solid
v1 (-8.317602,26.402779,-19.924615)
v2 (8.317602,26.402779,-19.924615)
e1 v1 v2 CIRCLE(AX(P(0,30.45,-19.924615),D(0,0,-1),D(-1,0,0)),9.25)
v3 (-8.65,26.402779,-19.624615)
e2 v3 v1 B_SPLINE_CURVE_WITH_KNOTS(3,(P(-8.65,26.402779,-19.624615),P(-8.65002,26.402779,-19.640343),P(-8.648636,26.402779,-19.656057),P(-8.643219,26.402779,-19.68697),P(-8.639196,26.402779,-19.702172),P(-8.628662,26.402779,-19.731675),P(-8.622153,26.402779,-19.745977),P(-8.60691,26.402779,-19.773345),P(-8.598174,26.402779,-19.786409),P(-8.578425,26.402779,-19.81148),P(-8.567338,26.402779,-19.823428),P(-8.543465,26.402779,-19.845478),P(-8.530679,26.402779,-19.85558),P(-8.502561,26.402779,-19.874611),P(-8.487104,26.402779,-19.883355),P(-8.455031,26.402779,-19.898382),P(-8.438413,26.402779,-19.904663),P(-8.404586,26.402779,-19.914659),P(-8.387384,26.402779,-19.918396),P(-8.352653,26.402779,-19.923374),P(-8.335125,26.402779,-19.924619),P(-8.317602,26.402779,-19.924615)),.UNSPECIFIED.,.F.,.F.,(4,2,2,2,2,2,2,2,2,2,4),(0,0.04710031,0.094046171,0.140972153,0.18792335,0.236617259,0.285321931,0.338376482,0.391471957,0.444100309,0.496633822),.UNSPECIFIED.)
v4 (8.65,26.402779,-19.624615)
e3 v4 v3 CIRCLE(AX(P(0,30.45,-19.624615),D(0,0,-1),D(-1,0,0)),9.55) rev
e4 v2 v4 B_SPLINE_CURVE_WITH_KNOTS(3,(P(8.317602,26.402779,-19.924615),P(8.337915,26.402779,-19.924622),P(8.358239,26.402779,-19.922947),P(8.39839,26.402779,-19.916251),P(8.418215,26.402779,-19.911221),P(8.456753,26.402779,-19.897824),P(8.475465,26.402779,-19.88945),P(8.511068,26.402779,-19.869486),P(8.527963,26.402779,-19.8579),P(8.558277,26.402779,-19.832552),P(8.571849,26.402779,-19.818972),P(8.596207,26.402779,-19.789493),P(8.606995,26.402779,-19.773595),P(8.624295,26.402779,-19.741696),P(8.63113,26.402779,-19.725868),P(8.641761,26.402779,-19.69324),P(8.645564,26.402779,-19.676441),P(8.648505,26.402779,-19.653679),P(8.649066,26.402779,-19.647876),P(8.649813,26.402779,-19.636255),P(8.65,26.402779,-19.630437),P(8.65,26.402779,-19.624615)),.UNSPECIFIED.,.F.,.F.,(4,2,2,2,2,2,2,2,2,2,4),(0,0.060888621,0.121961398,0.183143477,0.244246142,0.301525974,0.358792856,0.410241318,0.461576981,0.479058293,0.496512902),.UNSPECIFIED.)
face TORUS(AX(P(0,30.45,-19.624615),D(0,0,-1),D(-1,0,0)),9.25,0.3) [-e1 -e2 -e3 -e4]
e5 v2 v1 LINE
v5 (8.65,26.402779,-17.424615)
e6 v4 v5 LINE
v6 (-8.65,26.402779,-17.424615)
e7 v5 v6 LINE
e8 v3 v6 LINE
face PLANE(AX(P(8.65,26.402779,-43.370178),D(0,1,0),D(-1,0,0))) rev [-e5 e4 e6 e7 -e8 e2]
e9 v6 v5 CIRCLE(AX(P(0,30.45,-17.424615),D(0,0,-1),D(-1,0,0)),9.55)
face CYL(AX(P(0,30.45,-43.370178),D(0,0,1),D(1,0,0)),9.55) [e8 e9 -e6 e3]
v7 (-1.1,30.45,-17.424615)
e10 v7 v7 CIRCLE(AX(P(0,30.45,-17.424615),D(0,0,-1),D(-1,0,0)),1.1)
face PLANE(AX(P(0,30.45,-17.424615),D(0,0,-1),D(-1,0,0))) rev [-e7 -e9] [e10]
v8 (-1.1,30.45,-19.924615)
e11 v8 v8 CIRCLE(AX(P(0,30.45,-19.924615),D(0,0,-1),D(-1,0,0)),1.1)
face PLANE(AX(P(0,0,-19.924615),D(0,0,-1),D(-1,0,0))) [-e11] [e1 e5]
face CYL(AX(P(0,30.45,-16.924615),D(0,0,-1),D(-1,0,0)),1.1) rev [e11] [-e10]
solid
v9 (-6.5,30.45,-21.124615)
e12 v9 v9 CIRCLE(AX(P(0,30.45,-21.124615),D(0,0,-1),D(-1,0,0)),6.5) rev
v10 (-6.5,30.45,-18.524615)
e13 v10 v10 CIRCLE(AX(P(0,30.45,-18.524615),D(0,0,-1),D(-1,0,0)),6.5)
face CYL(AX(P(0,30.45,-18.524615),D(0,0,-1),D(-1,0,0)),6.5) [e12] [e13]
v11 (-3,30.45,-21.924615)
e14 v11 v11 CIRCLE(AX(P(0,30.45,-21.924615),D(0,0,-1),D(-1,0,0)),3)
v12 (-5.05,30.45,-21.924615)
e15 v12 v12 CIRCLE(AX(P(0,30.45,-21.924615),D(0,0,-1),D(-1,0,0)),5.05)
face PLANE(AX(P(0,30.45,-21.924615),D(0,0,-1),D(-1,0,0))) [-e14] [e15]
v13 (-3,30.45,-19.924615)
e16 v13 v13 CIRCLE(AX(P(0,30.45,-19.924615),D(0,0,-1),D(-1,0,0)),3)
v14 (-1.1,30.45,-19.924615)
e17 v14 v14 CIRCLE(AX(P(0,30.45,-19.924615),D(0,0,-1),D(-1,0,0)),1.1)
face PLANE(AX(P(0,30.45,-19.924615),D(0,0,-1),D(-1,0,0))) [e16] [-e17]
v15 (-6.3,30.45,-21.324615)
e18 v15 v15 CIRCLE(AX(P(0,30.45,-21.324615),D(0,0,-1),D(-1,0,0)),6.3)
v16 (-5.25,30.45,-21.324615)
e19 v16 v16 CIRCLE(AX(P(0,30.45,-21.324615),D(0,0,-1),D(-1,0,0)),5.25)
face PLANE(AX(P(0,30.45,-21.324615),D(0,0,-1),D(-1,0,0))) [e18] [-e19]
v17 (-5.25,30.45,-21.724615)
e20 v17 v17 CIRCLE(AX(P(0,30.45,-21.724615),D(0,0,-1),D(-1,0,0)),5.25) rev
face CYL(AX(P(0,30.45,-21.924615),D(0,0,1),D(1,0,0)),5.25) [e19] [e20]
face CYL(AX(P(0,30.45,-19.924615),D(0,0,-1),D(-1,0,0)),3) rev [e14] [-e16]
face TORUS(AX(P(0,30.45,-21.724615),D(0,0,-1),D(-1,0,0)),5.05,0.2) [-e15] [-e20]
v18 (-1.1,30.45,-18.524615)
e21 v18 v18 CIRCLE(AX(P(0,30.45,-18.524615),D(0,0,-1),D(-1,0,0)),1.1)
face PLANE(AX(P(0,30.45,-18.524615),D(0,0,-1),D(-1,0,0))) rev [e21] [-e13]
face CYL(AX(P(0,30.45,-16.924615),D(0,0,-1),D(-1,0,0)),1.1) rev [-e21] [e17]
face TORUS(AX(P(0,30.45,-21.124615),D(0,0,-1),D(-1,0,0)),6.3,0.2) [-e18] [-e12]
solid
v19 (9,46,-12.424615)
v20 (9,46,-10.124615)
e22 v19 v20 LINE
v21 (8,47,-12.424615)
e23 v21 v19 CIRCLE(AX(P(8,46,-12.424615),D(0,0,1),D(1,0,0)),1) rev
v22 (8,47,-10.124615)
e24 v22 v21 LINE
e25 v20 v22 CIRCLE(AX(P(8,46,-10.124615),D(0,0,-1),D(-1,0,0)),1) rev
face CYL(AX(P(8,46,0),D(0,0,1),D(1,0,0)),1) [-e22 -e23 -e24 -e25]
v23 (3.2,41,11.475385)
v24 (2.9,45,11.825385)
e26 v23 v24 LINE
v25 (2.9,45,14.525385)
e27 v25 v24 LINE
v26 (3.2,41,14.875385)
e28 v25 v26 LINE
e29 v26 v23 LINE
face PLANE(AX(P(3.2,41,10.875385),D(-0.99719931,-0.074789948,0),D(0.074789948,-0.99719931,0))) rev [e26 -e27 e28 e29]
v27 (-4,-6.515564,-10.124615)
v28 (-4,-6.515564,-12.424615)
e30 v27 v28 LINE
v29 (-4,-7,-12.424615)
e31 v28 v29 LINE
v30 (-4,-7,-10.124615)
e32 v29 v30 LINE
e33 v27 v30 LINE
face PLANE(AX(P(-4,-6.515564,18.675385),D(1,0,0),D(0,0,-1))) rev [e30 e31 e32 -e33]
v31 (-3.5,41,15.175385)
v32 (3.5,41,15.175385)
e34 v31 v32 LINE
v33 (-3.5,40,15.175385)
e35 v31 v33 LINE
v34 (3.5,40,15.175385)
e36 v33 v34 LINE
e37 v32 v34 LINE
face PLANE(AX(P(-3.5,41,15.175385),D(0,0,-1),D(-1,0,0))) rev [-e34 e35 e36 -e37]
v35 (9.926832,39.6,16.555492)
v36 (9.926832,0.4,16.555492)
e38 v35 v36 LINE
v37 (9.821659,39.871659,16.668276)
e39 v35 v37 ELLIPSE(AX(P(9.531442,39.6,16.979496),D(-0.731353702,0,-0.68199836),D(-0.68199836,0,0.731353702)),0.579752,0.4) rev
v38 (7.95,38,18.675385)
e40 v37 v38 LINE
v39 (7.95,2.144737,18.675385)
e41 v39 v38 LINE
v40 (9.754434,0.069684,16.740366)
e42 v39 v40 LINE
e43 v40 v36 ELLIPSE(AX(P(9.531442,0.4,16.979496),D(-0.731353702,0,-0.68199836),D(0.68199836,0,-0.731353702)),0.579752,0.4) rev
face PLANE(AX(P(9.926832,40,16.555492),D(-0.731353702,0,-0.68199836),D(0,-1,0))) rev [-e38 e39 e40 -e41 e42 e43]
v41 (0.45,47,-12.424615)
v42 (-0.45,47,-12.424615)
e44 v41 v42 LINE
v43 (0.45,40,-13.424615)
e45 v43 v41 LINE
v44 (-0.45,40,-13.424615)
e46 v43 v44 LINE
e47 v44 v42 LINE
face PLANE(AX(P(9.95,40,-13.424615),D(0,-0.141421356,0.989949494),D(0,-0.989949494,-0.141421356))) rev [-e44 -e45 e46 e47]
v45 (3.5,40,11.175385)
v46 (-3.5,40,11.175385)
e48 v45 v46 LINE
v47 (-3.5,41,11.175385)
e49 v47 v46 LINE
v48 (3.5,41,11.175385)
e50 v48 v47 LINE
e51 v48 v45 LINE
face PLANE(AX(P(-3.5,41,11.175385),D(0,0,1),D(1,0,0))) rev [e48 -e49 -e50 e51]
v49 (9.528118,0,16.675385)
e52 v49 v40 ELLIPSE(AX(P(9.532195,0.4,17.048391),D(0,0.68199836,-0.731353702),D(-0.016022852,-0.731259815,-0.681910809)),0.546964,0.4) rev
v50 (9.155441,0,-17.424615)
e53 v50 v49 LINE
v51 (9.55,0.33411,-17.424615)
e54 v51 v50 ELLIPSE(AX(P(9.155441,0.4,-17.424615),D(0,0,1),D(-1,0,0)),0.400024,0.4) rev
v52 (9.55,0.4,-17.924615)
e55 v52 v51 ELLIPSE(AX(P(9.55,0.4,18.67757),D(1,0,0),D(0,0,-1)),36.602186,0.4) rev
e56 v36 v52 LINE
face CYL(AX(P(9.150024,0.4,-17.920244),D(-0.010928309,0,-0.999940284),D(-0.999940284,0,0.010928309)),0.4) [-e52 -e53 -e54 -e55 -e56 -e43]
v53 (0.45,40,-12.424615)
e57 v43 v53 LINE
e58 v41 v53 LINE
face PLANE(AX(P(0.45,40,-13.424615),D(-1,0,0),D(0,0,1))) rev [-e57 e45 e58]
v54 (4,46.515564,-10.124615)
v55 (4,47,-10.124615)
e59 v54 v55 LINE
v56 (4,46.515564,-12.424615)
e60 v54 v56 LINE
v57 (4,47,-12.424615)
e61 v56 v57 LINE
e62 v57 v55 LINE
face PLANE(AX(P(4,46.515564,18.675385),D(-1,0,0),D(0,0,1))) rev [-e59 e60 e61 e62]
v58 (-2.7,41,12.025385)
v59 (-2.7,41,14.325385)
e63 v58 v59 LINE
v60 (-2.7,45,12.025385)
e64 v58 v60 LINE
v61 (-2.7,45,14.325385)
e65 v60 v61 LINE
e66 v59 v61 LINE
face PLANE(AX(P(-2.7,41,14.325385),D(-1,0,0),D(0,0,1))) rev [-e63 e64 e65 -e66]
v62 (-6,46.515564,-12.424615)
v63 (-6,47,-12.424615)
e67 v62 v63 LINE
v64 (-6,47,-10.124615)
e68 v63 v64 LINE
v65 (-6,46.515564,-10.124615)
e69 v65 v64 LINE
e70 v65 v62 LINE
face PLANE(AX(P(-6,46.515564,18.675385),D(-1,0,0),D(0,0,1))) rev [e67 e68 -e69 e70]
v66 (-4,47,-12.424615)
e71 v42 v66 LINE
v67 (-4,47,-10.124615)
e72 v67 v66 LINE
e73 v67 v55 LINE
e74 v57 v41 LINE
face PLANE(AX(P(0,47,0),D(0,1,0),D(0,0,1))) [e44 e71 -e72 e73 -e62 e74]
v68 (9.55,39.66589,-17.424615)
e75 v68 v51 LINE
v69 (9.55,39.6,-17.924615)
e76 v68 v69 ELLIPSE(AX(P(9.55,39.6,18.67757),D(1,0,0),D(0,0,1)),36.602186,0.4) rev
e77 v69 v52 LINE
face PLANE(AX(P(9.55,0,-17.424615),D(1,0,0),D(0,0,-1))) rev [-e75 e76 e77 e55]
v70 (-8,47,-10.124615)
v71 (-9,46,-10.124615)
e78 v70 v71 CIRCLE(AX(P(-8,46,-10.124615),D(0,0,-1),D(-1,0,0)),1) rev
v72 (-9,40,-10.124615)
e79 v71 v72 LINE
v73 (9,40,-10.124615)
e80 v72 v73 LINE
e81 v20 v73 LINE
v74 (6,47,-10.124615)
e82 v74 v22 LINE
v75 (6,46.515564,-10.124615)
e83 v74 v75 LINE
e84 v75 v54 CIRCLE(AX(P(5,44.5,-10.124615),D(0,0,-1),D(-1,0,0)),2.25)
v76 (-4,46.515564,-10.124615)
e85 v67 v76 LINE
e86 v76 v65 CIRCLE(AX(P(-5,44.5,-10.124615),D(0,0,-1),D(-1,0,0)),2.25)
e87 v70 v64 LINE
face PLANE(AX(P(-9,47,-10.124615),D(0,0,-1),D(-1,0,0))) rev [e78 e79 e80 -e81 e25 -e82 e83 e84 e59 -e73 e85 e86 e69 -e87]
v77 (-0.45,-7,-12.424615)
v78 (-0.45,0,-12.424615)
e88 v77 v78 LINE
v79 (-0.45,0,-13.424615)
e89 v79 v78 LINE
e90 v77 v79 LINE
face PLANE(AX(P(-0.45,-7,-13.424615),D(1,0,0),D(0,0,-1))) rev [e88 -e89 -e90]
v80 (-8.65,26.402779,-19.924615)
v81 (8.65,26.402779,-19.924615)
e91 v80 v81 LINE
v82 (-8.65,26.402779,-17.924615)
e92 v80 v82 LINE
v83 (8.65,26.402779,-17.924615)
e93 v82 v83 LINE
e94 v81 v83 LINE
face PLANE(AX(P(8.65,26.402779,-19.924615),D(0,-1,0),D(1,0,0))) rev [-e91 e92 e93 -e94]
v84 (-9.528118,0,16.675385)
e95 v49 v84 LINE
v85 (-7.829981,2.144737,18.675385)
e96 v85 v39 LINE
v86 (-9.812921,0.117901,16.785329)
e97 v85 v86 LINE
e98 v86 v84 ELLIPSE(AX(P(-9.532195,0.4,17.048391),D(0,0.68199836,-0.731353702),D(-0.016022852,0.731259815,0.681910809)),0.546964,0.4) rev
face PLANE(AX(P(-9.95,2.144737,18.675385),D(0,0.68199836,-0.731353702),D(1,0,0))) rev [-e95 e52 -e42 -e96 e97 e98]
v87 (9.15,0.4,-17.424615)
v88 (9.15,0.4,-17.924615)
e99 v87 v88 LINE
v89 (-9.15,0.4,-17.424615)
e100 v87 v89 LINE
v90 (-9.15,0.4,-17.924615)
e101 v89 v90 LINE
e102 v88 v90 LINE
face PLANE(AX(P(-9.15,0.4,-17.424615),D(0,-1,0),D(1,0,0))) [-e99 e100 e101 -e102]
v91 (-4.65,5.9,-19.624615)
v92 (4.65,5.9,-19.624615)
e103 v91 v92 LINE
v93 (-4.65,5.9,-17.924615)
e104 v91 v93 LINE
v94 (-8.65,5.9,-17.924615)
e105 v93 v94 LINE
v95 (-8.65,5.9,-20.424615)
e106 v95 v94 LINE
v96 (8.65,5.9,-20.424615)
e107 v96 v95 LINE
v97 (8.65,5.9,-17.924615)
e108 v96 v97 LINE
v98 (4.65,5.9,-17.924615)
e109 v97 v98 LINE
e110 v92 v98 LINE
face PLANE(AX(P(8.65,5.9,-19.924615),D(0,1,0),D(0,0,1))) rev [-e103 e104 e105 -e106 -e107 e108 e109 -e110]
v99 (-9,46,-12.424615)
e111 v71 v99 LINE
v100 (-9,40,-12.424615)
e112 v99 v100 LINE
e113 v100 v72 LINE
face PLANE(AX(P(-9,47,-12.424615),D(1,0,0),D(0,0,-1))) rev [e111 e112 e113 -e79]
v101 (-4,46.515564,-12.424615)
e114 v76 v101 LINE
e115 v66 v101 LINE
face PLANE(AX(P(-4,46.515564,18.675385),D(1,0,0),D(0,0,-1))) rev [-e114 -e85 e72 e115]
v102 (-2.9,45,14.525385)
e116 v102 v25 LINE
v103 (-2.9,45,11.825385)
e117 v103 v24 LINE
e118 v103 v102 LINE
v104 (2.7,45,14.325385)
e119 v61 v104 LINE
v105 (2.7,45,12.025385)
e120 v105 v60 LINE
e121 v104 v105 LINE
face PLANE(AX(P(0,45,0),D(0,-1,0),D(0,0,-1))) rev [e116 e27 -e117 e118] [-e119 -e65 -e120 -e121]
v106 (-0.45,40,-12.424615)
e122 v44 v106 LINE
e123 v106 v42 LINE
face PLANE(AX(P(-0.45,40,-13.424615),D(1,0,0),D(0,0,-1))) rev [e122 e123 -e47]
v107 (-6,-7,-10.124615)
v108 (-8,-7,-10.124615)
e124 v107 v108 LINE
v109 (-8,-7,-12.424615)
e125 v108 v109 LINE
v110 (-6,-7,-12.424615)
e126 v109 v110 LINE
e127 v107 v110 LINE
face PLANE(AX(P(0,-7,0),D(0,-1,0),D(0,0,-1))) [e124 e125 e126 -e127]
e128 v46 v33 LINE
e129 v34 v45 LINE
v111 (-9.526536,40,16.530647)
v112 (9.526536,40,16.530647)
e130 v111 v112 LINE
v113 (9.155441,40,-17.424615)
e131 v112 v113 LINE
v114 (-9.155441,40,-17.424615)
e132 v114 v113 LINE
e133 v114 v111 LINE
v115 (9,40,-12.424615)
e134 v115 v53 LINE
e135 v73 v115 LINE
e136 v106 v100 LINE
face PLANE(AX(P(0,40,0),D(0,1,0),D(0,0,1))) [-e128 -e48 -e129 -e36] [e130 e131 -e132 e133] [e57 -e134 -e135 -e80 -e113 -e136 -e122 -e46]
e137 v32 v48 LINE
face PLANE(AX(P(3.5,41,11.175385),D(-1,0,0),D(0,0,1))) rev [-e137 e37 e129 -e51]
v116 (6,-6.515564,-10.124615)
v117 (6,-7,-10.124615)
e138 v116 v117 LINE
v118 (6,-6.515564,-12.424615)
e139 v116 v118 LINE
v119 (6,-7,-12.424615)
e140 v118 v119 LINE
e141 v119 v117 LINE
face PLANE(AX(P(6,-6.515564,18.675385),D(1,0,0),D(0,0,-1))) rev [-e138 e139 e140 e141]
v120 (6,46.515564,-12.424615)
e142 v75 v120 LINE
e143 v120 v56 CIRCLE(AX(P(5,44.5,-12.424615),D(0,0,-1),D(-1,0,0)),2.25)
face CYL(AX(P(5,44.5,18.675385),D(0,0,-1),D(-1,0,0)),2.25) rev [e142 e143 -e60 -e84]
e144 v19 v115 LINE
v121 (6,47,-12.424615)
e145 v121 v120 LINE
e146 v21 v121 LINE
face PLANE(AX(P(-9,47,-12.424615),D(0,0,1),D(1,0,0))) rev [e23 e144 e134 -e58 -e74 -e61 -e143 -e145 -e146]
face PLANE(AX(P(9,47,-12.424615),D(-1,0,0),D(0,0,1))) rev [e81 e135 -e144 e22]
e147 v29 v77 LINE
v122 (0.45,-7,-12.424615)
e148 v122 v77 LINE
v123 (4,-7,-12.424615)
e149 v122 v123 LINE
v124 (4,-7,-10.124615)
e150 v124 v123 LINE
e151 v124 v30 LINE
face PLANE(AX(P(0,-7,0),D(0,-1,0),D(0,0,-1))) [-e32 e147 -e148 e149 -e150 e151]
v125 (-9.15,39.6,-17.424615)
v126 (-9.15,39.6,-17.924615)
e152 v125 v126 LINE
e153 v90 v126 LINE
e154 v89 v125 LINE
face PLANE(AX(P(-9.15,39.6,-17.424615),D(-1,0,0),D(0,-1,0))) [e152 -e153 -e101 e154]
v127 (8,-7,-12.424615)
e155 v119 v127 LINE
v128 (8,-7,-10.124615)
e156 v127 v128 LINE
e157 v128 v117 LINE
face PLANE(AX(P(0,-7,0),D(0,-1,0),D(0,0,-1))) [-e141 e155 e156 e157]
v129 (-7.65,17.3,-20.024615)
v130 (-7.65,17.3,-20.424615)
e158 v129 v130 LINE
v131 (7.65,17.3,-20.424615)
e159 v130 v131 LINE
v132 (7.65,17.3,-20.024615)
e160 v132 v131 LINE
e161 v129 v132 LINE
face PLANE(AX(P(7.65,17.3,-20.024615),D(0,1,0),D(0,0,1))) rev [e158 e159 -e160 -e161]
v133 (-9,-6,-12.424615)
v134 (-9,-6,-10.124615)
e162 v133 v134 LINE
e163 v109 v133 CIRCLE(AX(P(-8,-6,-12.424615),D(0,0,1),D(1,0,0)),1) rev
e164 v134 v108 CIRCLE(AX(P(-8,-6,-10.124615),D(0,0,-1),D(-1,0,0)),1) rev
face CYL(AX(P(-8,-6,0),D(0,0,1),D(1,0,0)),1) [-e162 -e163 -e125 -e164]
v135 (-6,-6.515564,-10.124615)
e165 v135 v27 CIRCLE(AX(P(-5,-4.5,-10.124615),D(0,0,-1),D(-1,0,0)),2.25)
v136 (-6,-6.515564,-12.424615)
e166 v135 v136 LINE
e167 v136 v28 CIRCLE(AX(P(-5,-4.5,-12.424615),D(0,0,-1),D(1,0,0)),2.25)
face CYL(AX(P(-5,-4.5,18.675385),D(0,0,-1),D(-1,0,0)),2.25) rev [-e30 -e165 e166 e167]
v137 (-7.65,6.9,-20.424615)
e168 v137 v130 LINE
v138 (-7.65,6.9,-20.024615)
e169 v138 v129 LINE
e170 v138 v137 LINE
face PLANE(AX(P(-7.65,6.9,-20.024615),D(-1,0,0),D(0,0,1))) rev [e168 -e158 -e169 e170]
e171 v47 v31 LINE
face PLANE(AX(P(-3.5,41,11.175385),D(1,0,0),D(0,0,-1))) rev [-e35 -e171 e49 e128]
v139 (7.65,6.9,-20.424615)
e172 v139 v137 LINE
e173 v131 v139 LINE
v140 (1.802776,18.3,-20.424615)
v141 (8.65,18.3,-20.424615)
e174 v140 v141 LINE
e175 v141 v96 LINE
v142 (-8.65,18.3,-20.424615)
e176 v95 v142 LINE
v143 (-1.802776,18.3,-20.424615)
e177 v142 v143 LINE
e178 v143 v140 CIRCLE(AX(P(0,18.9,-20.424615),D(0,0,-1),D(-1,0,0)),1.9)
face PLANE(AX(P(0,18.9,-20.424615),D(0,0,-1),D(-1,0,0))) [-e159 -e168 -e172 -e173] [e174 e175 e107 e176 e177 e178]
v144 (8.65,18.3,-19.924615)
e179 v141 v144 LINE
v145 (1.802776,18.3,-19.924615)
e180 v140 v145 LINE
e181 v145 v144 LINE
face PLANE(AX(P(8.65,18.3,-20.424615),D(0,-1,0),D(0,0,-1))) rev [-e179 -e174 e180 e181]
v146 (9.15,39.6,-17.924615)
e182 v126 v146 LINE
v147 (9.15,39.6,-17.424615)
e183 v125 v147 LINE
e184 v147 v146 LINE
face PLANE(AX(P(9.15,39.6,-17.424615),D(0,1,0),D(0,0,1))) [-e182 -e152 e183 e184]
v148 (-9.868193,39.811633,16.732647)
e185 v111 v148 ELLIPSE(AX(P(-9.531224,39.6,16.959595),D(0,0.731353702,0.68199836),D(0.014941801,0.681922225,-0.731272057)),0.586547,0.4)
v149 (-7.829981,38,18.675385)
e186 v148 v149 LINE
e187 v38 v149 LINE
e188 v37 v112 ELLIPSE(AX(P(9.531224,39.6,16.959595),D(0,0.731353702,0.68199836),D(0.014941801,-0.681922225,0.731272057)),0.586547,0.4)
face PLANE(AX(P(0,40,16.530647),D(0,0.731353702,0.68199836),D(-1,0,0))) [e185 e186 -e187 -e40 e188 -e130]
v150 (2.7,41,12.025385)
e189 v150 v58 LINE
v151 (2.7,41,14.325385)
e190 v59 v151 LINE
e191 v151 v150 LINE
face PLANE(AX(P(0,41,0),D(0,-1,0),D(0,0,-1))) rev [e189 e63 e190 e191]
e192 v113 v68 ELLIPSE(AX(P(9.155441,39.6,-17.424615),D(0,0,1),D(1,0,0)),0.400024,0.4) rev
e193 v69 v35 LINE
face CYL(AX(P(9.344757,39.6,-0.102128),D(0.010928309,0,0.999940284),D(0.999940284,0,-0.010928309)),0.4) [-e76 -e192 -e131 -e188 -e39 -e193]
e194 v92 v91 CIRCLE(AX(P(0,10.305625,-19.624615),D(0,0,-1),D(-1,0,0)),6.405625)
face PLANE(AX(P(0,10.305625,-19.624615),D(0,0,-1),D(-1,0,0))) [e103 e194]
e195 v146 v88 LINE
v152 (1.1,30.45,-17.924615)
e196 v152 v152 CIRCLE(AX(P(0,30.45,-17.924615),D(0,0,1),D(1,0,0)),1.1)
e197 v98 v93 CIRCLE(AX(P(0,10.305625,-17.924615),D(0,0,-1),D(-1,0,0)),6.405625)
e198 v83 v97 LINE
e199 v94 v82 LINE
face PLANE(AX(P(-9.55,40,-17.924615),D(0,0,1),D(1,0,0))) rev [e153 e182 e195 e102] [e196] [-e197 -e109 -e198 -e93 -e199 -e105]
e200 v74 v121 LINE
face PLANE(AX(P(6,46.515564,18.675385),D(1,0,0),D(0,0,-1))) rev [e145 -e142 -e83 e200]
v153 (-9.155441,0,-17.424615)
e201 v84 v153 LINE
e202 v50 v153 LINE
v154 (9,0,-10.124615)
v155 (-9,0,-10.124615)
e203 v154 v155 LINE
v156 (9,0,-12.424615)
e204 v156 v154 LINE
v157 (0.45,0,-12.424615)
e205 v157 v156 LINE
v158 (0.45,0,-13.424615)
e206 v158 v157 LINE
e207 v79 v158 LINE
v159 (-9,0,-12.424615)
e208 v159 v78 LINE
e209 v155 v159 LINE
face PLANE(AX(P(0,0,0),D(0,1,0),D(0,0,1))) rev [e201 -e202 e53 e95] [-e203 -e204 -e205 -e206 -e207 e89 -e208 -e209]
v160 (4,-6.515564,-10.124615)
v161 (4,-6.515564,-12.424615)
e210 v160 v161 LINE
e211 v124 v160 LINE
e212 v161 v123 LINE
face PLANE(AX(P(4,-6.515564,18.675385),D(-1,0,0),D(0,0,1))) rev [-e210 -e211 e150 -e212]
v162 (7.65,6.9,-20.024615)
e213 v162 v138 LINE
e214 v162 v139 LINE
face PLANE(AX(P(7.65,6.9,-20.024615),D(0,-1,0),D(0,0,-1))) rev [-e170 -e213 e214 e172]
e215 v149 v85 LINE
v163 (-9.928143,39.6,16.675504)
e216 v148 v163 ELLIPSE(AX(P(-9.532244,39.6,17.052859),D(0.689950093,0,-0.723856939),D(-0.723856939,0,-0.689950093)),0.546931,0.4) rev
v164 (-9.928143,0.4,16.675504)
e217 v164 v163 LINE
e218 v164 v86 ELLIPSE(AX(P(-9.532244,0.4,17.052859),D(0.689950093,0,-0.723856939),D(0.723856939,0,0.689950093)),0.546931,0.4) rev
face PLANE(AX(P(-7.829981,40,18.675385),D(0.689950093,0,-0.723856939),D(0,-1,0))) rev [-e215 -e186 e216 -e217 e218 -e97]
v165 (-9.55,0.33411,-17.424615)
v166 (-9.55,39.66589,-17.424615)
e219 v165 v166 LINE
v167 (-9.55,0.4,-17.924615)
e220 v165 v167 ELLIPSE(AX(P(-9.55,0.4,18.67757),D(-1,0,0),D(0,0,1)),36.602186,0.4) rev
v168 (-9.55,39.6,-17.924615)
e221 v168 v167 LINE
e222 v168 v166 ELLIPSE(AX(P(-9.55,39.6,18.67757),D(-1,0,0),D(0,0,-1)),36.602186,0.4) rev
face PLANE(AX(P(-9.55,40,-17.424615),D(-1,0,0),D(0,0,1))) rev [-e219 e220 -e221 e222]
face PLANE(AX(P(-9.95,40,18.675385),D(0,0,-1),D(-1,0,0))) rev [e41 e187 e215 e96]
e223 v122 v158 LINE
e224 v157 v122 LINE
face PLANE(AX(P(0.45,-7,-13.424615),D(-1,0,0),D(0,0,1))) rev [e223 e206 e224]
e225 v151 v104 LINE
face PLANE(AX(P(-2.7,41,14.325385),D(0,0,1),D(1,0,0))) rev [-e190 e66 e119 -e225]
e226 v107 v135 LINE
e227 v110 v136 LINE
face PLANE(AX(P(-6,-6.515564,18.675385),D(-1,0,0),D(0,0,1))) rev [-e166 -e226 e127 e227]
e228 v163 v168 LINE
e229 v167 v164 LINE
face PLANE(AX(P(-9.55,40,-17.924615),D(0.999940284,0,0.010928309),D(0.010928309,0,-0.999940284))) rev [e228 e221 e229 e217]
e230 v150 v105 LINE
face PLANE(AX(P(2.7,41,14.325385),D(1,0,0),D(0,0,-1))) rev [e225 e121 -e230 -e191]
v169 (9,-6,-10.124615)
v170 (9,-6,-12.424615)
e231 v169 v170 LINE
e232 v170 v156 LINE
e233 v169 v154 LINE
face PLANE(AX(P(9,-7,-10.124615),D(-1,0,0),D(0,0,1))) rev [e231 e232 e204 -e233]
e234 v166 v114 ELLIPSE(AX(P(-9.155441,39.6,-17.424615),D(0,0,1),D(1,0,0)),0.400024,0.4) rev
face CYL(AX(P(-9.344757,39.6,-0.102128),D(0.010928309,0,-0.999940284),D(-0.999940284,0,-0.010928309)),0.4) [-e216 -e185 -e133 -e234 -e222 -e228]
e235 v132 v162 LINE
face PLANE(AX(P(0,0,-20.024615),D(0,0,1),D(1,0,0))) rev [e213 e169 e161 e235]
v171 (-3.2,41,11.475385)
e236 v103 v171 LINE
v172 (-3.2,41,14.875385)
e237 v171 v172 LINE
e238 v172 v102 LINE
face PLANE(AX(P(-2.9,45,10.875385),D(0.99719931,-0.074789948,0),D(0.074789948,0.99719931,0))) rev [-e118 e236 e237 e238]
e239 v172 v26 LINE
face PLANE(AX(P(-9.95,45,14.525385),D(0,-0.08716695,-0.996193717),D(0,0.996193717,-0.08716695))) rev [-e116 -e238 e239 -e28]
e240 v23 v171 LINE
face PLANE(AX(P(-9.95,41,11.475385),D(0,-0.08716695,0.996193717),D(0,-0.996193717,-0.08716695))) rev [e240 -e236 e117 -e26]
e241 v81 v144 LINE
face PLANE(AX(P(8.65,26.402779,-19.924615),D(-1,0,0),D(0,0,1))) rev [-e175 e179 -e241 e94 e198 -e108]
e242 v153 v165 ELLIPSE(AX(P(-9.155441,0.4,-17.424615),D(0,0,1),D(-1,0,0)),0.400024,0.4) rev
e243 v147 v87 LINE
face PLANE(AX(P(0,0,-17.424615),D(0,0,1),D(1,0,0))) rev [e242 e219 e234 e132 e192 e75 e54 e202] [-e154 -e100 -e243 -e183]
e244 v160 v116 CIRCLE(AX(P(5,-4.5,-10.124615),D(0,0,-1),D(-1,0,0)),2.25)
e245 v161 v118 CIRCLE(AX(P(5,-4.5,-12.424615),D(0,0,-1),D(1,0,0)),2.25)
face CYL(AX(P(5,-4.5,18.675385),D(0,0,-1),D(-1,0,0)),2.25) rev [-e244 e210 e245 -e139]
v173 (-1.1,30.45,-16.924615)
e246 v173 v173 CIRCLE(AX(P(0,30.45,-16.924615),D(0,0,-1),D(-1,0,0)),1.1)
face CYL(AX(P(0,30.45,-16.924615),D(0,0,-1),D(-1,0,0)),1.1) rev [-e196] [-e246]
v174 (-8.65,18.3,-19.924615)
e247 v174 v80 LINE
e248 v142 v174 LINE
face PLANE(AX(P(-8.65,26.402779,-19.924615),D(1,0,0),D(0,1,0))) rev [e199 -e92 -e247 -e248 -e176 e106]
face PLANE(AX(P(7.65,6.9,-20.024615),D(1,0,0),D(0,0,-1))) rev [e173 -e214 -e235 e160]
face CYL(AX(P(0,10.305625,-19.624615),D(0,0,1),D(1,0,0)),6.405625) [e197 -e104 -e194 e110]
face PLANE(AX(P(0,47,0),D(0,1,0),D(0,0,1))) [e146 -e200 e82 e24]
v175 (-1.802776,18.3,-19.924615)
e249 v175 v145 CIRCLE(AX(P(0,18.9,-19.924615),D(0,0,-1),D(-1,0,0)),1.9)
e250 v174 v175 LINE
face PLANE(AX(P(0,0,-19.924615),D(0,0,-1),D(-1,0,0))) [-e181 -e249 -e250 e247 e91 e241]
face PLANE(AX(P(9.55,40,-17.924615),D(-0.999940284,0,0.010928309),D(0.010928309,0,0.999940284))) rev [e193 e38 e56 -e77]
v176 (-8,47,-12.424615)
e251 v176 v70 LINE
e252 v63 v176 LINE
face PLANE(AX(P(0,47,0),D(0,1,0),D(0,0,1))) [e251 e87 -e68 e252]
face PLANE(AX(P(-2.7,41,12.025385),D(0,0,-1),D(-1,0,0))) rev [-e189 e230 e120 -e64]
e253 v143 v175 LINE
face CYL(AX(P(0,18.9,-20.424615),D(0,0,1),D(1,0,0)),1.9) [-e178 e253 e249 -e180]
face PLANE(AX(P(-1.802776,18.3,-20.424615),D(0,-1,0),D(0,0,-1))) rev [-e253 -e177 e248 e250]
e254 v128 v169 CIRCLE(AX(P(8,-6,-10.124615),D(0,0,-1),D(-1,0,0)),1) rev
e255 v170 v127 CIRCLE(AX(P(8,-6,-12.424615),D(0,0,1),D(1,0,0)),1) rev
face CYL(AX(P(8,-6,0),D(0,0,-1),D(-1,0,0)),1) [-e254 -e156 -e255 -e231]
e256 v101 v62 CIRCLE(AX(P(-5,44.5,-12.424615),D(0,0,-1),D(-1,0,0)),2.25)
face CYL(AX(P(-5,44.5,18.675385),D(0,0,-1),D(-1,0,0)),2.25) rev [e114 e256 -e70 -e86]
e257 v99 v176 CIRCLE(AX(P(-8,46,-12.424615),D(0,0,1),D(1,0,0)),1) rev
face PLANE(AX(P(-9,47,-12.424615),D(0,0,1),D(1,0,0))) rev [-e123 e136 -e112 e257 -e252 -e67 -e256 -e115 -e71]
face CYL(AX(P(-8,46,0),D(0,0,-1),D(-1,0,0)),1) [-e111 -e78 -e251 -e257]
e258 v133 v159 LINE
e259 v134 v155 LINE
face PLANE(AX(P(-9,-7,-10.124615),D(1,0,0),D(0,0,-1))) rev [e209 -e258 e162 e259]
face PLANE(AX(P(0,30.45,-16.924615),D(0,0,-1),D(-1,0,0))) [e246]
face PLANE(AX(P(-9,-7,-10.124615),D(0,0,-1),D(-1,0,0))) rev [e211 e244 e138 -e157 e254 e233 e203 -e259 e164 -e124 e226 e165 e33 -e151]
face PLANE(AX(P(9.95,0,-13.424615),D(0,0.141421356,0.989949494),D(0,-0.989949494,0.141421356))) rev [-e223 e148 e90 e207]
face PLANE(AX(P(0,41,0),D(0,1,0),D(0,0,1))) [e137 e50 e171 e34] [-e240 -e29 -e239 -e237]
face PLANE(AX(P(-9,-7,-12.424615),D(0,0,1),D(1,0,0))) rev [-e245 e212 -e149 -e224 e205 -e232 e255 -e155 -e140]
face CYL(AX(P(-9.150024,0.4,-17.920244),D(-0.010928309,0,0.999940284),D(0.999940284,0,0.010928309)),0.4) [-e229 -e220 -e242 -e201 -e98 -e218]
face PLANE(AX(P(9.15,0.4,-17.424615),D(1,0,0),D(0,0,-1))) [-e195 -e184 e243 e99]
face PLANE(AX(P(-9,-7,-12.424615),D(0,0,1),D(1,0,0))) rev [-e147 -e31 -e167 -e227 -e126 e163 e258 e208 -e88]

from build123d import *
from OCP.BRepFilletAPI import BRepFilletAPI_MakeChamfer

# Parameters (mm, degrees)
SALIENTE_EXTRUIR1_DEPTH       = 40
CROQUIS2_W                    = 19.1
CROQUIS2_H                    = 40
CROQUIS2_W_2                  = 18.3
CROQUIS2_H_2                  = 39.2
CORTAR_EXTRUIR1_DEPTH         = 0.5
CROQUIS3_W                    = 17.3
CROQUIS3_H                    = 20.502778731
SALIENTE_EXTRUIR5_DEPTH       = 2
SALIENTE_EXTRUIR10_DEPTH      = 2.5
SALIENTE_EXTRUIR11_DEPTH      = 1.7
SALIENTE_EXTRUIR12_DEPTH      = 0.5
SALIENTE_EXTRUIR14_DEPTH      = 1.4
SALIENTE_EXTRUIR14_DEPTH_BACK = 1.4
CROQUIS7_R                    = 6.5
CROQUIS8_R                    = 5.25
SALIENTE_EXTRUIR15_DEPTH      = 0.6
CROQUIS9_W                    = 18
CROQUIS9_H                    = 2.3
SALIENTE_EXTRUIR16_DEPTH      = 7
CROQUIS10_W                   = 18
CROQUIS10_H                   = 2.3
SALIENTE_EXTRUIR17_DEPTH      = 7
CORTAR_EXTRUIR2_DEPTH         = 58.229472302
CROQUIS12_W                   = 0.9
CROQUIS12_H                   = 7
SALIENTE_EXTRUIR18_DEPTH      = 1
CORTAR_EXTRUIR3_DEPTH         = 53.894695006
CROQUIS14_W                   = 15.3
CROQUIS14_H                   = 10.4
CORTAR_EXTRUIR4_DEPTH         = 0.4
CROQUIS15_R                   = 3
CORTAR_EXTRUIR5_DEPTH         = 2
CROQUIS16_R                   = 1.1
CORTAR_EXTRUIR6_DEPTH         = 3
CROQUIS17_W                   = 7
CROQUIS17_H                   = 4
SALIENTE_EXTRUIR19_DEPTH      = 1
CROQUIS18_W                   = 6.4
CROQUIS18_H                   = 3.4
SALIENTE_EXTRUIR20_DEPTH      = 4
CORTAR_EXTRUIR7_DEPTH         = 4
CORTAR_EXTRUIR9_DEPTH         = 54.577898986
CROQUIS23_W                   = 5.4
CROQUIS23_H                   = 2.3
CORTAR_EXTRUIR10_DEPTH        = 4
REDONDEO1_R                   = 1
REDONDEO2_R                   = 0.3
REDONDEO3_R                   = 0.2
CHAFL_N1_SIZE                 = 2
CHAFL_N1_SIZE2                = 2.14473742
CHAFL_N1_SIZE2_2              = 2.12001914
REDONDEO5_R                   = 0.4


with BuildPart() as part:
    # Croquis1 → Saliente-Extruir1 (new body)
    with BuildSketch(Plane(origin=(0, 0, 0), x_dir=(1, 0, 0), z_dir=(0, 1, 0))):
        Polygon((-9.55, 17.924615385), (9.55, 17.924615385), (9.95, -18.675384615), (-9.95, -18.675384615), align=None)
    extrude(amount=SALIENTE_EXTRUIR1_DEPTH)

    # Croquis2 → Cortar-Extruir1 (cut)
    with BuildSketch(Plane(origin=(0, 0, -17.924615385), x_dir=(-1, 0, 0), z_dir=(0, 0, -1))):
        with Locations((0, 20)):
            Rectangle(CROQUIS2_W, CROQUIS2_H)
        with Locations((0, 20)):
            Rectangle(CROQUIS2_W_2, CROQUIS2_H_2, mode=Mode.SUBTRACT)
    extrude(amount=-CORTAR_EXTRUIR1_DEPTH, mode=Mode.SUBTRACT)

    # Croquis3 → Saliente-Extruir5 (add)
    with BuildSketch(Plane(origin=(0, 0, -17.924615385), x_dir=(-1, 0, 0), z_dir=(0, 0, -1))):
        with Locations((0, 16.151389366)):
            Rectangle(CROQUIS3_W, CROQUIS3_H)
    extrude(amount=SALIENTE_EXTRUIR5_DEPTH)

    # Croquis5 → Saliente-Extruir11 (add)
    with BuildSketch(Plane(origin=(0, 0, -17.924615385), x_dir=(-1, 0, 0), z_dir=(0, 0, -1))):
        with BuildLine():
            Line((-4.65, 5.9), (4.65, 5.9))
            ThreePointArc((4.65, 5.9), (0, 3.9), (-4.65, 5.9))
        make_face()
    extrude(amount=SALIENTE_EXTRUIR11_DEPTH)

    # Croquis6 → Saliente-Extruir12 (add)
    with BuildSketch(Plane(origin=(0, 0, -19.924615385), x_dir=(-1, 0, 0), z_dir=(0, 0, -1))):
        with BuildLine():
            Line((-8.65, 5.9), (8.65, 5.9))
            Line((8.65, 5.9), (8.65, 18.3))
            Line((8.65, 18.3), (1.802775638, 18.3))
            ThreePointArc((1.802775638, 18.3), (0, 20.8), (-1.802775638, 18.3))
            Line((-1.802775638, 18.3), (-8.65, 18.3))
            Line((-8.65, 18.3), (-8.65, 5.9))
        make_face()
    extrude(amount=SALIENTE_EXTRUIR12_DEPTH)

    # Croquis9 → Saliente-Extruir16 (add)
    with BuildSketch(Plane(origin=(0, 40, 0), x_dir=(1, 0, 0), z_dir=(0, 1, 0))):
        with Locations((0, 11.274615385)):
            Rectangle(CROQUIS9_W, CROQUIS9_H)
    extrude(amount=SALIENTE_EXTRUIR16_DEPTH)

    # Croquis10 → Saliente-Extruir17 (add)
    with BuildSketch(Plane.XZ):
        with Locations((0, -11.274615385)):
            Rectangle(CROQUIS10_W, CROQUIS10_H)
    extrude(amount=SALIENTE_EXTRUIR17_DEPTH)

    # Croquis11 → Cortar-Extruir2 (cut, through all)
    with BuildSketch(Plane(origin=(0, 0, -12.424615385), x_dir=(-1, 0, 0), z_dir=(0, 0, -1))):
        with BuildLine():
            Line((-6, 46.515564437), (-6, 47.543757467))
            Line((-6, 47.543757467), (-4, 47.543757467))
            Line((-4, 47.543757467), (-4, 46.515564437))
            ThreePointArc((-4, 46.515564437), (-5, 42.25), (-6, 46.515564437))
        make_face()
        with BuildLine():
            Line((4, 46.515564437), (4, 47.543757467))
            Line((4, 47.543757467), (6, 47.543757467))
            Line((6, 47.543757467), (6, 46.515564437))
            ThreePointArc((6, 46.515564437), (5, 42.25), (4, 46.515564437))
        make_face()
        with BuildLine():
            Line((6, -6.515564437), (6, -7.543757467))
            Line((6, -7.543757467), (4, -7.543757467))
            Line((4, -7.543757467), (4, -6.515564437))
            ThreePointArc((4, -6.515564437), (5, -2.25), (6, -6.515564437))
        make_face()
        with BuildLine():
            Line((-4, -6.515564437), (-4, -7.543757467))
            Line((-4, -7.543757467), (-6, -7.543757467))
            Line((-6, -7.543757467), (-6, -6.515564437))
            ThreePointArc((-6, -6.515564437), (-5, -2.25), (-4, -6.515564437))
        make_face()
    extrude(amount=-CORTAR_EXTRUIR2_DEPTH, mode=Mode.SUBTRACT)

    # Croquis12 → Saliente-Extruir18 (add)
    with BuildSketch(Plane(origin=(0, 0, -12.424615385), x_dir=(-1, 0, 0), z_dir=(0, 0, -1))):
        with Locations((0, -3.5)):
            Rectangle(CROQUIS12_W, CROQUIS12_H)
        with Locations((0, 43.5)):
            Rectangle(CROQUIS12_W, CROQUIS12_H)
    extrude(amount=SALIENTE_EXTRUIR18_DEPTH)

    # Croquis13 → Cortar-Extruir3 (cut, through all)
    with BuildSketch(Plane.ZY.offset(0.45)):
        Polygon((-13.424615385, 40), (-12.424615385, 47), (-13.424615385, 47), align=None)
        Polygon((-13.424615385, 0), (-12.424615385, -7), (-13.424615385, -7), align=None)
    extrude(amount=-CORTAR_EXTRUIR3_DEPTH, mode=Mode.SUBTRACT)

    # Croquis14 → Cortar-Extruir4 (cut)
    with BuildSketch(Plane(origin=(0, 0, -20.424615385), x_dir=(-1, 0, 0), z_dir=(0, 0, -1))):
        with Locations((0, 12.1)):
            Rectangle(CROQUIS14_W, CROQUIS14_H)
    extrude(amount=-CORTAR_EXTRUIR4_DEPTH, mode=Mode.SUBTRACT)


with BuildPart() as body_2:
    # Croquis4 → Saliente-Extruir10 (new body)
    with BuildSketch(Plane(origin=(0, 0, -17.424615385), x_dir=(-1, 0, 0), z_dir=(0, 0, -1))):
        with BuildLine():
            Line((-8.65, 26.402778731), (8.65, 26.402778731))
            ThreePointArc((8.65, 26.402778731), (0, 40), (-8.65, 26.402778731))
        make_face()
    extrude(amount=SALIENTE_EXTRUIR10_DEPTH)


with BuildPart() as body_3:
    # Croquis7 → Saliente-Extruir14 (new, two sides: drawn at the far end of the back side and taken through both)
    with BuildSketch(Plane(origin=(0, 0, -19.924615385), x_dir=(-1, 0, 0), z_dir=(0, 0, -1)).offset(-SALIENTE_EXTRUIR14_DEPTH_BACK)):
        with Locations((0, 30.45)):
            Circle(CROQUIS7_R)
    extrude(amount=SALIENTE_EXTRUIR14_DEPTH + SALIENTE_EXTRUIR14_DEPTH_BACK)

    # Croquis8 → Saliente-Extruir15 (add)
    with BuildSketch(Plane(origin=(0, 0, -21.324615385), x_dir=(-1, 0, 0), z_dir=(0, 0, -1))):
        with Locations((0, 30.45)):
            Circle(CROQUIS8_R)
    extrude(amount=SALIENTE_EXTRUIR15_DEPTH)

    # Croquis15 → Cortar-Extruir5 (cut)
    with BuildSketch(Plane(origin=(0, 0, -21.924615385), x_dir=(-1, 0, 0), z_dir=(0, 0, -1))):
        with Locations((0, 30.45)):
            Circle(CROQUIS15_R)
    extrude(amount=-CORTAR_EXTRUIR5_DEPTH, mode=Mode.SUBTRACT)


with BuildPart() as cortar_extruir6_tool:
    # Croquis16 → Cortar-Extruir6 (new body)
    with BuildSketch(Plane(origin=(0, 0, -19.924615385), x_dir=(-1, 0, 0), z_dir=(0, 0, -1))):
        with Locations((0, 30.45)):
            Circle(CROQUIS16_R)
    extrude(amount=-CORTAR_EXTRUIR6_DEPTH)


with BuildPart() as part_1:
    add(part.part)

    # Cortar-Extruir6: cut by cortar_extruir6_tool
    add(cortar_extruir6_tool.part, mode=Mode.SUBTRACT)

    # Croquis17 → Saliente-Extruir19 (add)
    with BuildSketch(Plane(origin=(0, 40, 0), x_dir=(1, 0, 0), z_dir=(0, 1, 0))):
        with Locations((0, -13.175384615)):
            Rectangle(CROQUIS17_W, CROQUIS17_H)
    extrude(amount=SALIENTE_EXTRUIR19_DEPTH)

    # Croquis18 → Saliente-Extruir20 (add)
    with BuildSketch(Plane(origin=(0, 41, 0), x_dir=(1, 0, 0), z_dir=(0, 1, 0))):
        with Locations((0, -13.175384615)):
            Rectangle(CROQUIS18_W, CROQUIS18_H)
    extrude(amount=SALIENTE_EXTRUIR20_DEPTH)

    # Croquis20 → Cortar-Extruir7 (cut)
    with BuildSketch(Plane.XY.offset(14.875384615)):
        Polygon((-2.9, 45), (2.9, 45), (3.2, 41), (3.2, 45.300749245), (-3.2, 45.300749245), (-3.2, 41), align=None)
    extrude(amount=-CORTAR_EXTRUIR7_DEPTH, mode=Mode.SUBTRACT)

    # Croquis22 → Cortar-Extruir9 (cut, through all)
    with BuildSketch(Plane(origin=(3.5, 0, 0), x_dir=(0, 0, -1), z_dir=(1, 0, 0))):
        Polygon((-14.525384615, 45), (-11.825384615, 45), (-11.475384615, 41), (-11.475384615, 45.799584753), (-14.875384615, 45.799584753), (-14.875384615, 41), align=None)
    extrude(amount=-CORTAR_EXTRUIR9_DEPTH, mode=Mode.SUBTRACT)

    # Croquis23 → Cortar-Extruir10 (cut)
    with BuildSketch(Plane(origin=(0, 45, 0), x_dir=(1, 0, 0), z_dir=(0, 1, 0))):
        with Locations((0, -13.175384615)):
            Rectangle(CROQUIS23_W, CROQUIS23_H)
    extrude(amount=-CORTAR_EXTRUIR10_DEPTH, mode=Mode.SUBTRACT)

    # Redondeo1
    redondeo1_edges = [part_1.edges().sort_by_distance(p)[0] for p in [
        (9, 47, -11.274615385),
        (-9, 47, -11.274615385),
        (9, -7, -11.274615385),
        (-9, -7, -11.274615385),
    ]]
    fillet(redondeo1_edges, radius=REDONDEO1_R)

    # Chaflán1: one chamfer whose edges measure the first distance from different faces: ONE call of the kernel's chamfer builder (chamfer() names one face for all edges)
    chafl_n1_edges_1 = [part_1.edges().sort_by_distance(p)[0] for p in [
        (0, 40, 18.675384615),
    ]]
    chafl_n1_side_1 = [part_1.faces().sort_by_distance(p)[0] for p in [
        (0, 20, 18.675384615),
    ]]
    chafl_n1_edges_2 = [part_1.edges().sort_by_distance(p)[0] for p in [
        (0, 0, 18.675384615),
    ]]
    chafl_n1_side_2 = [part_1.faces().sort_by_distance(p)[0] for p in [
        (0, 0, 1.517579221),
    ]]
    chafl_n1_edges_3 = [part_1.edges().sort_by_distance(p)[0] for p in [
        (9.95, 20, 18.675384615),
    ]]
    chafl_n1_side_3 = [part_1.faces().sort_by_distance(p)[0] for p in [
        (0, 20, 18.675384615),
    ]]
    chafl_n1_edges_4 = [part_1.edges().sort_by_distance(p)[0] for p in [
        (-9.95, 20, 18.675384615),
    ]]
    chafl_n1_side_4 = [part_1.faces().sort_by_distance(p)[0] for p in [
        (-9.75, 20, 0.375384615),
    ]]
    chafl_n1 = BRepFilletAPI_MakeChamfer(part_1.part.solid().wrapped)
    for e in chafl_n1_edges_1:
        chafl_n1.Add(CHAFL_N1_SIZE, CHAFL_N1_SIZE2, e.wrapped, chafl_n1_side_1[0].wrapped)  # the first distance lies on this face
    for e in chafl_n1_edges_2:
        chafl_n1.Add(CHAFL_N1_SIZE, CHAFL_N1_SIZE2, e.wrapped, chafl_n1_side_2[0].wrapped)  # the first distance lies on this face
    for e in chafl_n1_edges_3:
        chafl_n1.Add(CHAFL_N1_SIZE, CHAFL_N1_SIZE2_2, e.wrapped, chafl_n1_side_3[0].wrapped)  # the first distance lies on this face
    for e in chafl_n1_edges_4:
        chafl_n1.Add(CHAFL_N1_SIZE, CHAFL_N1_SIZE2_2, e.wrapped, chafl_n1_side_4[0].wrapped)  # the first distance lies on this face
    add(Compound.cast(chafl_n1.Shape()), mode=Mode.REPLACE)

    # Redondeo5
    # the kernel refuses this fillet: 0.4 mm, written as the material it takes off along each edge
    with BuildSketch(Plane(origin=(9.599180328, 0, -13.424615385), x_dir=(-0.999940284246931, 0, 0.010928309117452758), z_dir=(0.01092830911745276, 0, 0.9999402842469312))) as redondeo5_piece_1:
        with BuildLine():
            CenterArc((REDONDEO5_R, -REDONDEO5_R), REDONDEO5_R, 90, 90)
            Line((0, -REDONDEO5_R), (0, 0))
            Line((0, 0), (REDONDEO5_R, 0))
        make_face()
    extrude(amount=30.981897851, mode=Mode.SUBTRACT)
    with BuildSketch(Plane(origin=(-9.939070386, 0, 17.6753249), x_dir=(0.999940284246931, 0, 0.010928309117452758), z_dir=(0.01092830911745276, 0, -0.9999402842469312))) as redondeo5_piece_2:
        with BuildLine():
            CenterArc((REDONDEO5_R, -REDONDEO5_R), REDONDEO5_R, 90, 90)
            Line((0, -REDONDEO5_R), (0, 0))
            Line((0, 0), (REDONDEO5_R, 0))
        make_face()
    extrude(amount=36.602066288, mode=Mode.SUBTRACT)
    with BuildSketch(Plane(origin=(-9.937488556, 40, 17.53058748), x_dir=(0, -1, 0), z_dir=(0.01092830911745276, 0, -0.9999402842469312))) as redondeo5_piece_3:
        with BuildLine():
            CenterArc((REDONDEO5_R, -REDONDEO5_R), REDONDEO5_R, 90, 90)
            Line((0, -REDONDEO5_R), (0, 0))
            Line((0, 0), (REDONDEO5_R, 0))
        make_face()
    extrude(amount=36.457320225, mode=Mode.SUBTRACT)
    with BuildSketch(Plane(origin=(9.599180328, 40, -13.424615385), x_dir=(0, -1, 0), z_dir=(0.01092830911745276, 0, 0.9999402842469312))) as redondeo5_piece_4:
        with BuildLine():
            CenterArc((REDONDEO5_R, -REDONDEO5_R), REDONDEO5_R, 90, 90)
            Line((0, -REDONDEO5_R), (0, 0))
            Line((0, 0), (REDONDEO5_R, 0))
        make_face()
    extrude(amount=30.957051488, mode=Mode.SUBTRACT)
    with BuildSketch(Plane(origin=(9.539071691, 40, -18.924555669), x_dir=(0, -1, 0), z_dir=(0.01092830911745276, 0, 0.9999402842469312)), Plane(origin=(9.539071691, 0, -18.924555669), x_dir=(-0.999940284246931, 0, 0.010928309117452758), z_dir=(0.01092830911745276, 0, 0.9999402842469312))) as redondeo5_piece_5:
        with BuildLine():
            CenterArc((REDONDEO5_R, -REDONDEO5_R), REDONDEO5_R, 90, 90)
            Line((0, -REDONDEO5_R), (0, 0))
            Line((0, 0), (REDONDEO5_R, 0))
        make_face()
    extrude(amount=5.500268737, mode=Mode.SUBTRACT)


with BuildPart() as body_2_1:
    add(body_2.part)

    # Cortar-Extruir6: cut by cortar_extruir6_tool
    add(cortar_extruir6_tool.part, mode=Mode.SUBTRACT)

    # Redondeo2
    redondeo2_edges = [body_2_1.edges().sort_by_distance(p)[0] for p in [
        (0, 40, -19.924615385),
    ]]
    fillet(redondeo2_edges, radius=REDONDEO2_R)


with BuildPart() as body_3_1:
    add(body_3.part)

    # Cortar-Extruir6: cut by cortar_extruir6_tool
    add(cortar_extruir6_tool.part, mode=Mode.SUBTRACT)

    # Redondeo3
    redondeo3_edges = [body_3_1.edges().sort_by_distance(p)[0] for p in [
        (6.5, 30.45, -21.324615385),
        (5.25, 30.45, -21.924615385),
    ]]
    fillet(redondeo3_edges, radius=REDONDEO3_R)


solid = Compound([part_1.part, body_2_1.part, body_3_1.part])
